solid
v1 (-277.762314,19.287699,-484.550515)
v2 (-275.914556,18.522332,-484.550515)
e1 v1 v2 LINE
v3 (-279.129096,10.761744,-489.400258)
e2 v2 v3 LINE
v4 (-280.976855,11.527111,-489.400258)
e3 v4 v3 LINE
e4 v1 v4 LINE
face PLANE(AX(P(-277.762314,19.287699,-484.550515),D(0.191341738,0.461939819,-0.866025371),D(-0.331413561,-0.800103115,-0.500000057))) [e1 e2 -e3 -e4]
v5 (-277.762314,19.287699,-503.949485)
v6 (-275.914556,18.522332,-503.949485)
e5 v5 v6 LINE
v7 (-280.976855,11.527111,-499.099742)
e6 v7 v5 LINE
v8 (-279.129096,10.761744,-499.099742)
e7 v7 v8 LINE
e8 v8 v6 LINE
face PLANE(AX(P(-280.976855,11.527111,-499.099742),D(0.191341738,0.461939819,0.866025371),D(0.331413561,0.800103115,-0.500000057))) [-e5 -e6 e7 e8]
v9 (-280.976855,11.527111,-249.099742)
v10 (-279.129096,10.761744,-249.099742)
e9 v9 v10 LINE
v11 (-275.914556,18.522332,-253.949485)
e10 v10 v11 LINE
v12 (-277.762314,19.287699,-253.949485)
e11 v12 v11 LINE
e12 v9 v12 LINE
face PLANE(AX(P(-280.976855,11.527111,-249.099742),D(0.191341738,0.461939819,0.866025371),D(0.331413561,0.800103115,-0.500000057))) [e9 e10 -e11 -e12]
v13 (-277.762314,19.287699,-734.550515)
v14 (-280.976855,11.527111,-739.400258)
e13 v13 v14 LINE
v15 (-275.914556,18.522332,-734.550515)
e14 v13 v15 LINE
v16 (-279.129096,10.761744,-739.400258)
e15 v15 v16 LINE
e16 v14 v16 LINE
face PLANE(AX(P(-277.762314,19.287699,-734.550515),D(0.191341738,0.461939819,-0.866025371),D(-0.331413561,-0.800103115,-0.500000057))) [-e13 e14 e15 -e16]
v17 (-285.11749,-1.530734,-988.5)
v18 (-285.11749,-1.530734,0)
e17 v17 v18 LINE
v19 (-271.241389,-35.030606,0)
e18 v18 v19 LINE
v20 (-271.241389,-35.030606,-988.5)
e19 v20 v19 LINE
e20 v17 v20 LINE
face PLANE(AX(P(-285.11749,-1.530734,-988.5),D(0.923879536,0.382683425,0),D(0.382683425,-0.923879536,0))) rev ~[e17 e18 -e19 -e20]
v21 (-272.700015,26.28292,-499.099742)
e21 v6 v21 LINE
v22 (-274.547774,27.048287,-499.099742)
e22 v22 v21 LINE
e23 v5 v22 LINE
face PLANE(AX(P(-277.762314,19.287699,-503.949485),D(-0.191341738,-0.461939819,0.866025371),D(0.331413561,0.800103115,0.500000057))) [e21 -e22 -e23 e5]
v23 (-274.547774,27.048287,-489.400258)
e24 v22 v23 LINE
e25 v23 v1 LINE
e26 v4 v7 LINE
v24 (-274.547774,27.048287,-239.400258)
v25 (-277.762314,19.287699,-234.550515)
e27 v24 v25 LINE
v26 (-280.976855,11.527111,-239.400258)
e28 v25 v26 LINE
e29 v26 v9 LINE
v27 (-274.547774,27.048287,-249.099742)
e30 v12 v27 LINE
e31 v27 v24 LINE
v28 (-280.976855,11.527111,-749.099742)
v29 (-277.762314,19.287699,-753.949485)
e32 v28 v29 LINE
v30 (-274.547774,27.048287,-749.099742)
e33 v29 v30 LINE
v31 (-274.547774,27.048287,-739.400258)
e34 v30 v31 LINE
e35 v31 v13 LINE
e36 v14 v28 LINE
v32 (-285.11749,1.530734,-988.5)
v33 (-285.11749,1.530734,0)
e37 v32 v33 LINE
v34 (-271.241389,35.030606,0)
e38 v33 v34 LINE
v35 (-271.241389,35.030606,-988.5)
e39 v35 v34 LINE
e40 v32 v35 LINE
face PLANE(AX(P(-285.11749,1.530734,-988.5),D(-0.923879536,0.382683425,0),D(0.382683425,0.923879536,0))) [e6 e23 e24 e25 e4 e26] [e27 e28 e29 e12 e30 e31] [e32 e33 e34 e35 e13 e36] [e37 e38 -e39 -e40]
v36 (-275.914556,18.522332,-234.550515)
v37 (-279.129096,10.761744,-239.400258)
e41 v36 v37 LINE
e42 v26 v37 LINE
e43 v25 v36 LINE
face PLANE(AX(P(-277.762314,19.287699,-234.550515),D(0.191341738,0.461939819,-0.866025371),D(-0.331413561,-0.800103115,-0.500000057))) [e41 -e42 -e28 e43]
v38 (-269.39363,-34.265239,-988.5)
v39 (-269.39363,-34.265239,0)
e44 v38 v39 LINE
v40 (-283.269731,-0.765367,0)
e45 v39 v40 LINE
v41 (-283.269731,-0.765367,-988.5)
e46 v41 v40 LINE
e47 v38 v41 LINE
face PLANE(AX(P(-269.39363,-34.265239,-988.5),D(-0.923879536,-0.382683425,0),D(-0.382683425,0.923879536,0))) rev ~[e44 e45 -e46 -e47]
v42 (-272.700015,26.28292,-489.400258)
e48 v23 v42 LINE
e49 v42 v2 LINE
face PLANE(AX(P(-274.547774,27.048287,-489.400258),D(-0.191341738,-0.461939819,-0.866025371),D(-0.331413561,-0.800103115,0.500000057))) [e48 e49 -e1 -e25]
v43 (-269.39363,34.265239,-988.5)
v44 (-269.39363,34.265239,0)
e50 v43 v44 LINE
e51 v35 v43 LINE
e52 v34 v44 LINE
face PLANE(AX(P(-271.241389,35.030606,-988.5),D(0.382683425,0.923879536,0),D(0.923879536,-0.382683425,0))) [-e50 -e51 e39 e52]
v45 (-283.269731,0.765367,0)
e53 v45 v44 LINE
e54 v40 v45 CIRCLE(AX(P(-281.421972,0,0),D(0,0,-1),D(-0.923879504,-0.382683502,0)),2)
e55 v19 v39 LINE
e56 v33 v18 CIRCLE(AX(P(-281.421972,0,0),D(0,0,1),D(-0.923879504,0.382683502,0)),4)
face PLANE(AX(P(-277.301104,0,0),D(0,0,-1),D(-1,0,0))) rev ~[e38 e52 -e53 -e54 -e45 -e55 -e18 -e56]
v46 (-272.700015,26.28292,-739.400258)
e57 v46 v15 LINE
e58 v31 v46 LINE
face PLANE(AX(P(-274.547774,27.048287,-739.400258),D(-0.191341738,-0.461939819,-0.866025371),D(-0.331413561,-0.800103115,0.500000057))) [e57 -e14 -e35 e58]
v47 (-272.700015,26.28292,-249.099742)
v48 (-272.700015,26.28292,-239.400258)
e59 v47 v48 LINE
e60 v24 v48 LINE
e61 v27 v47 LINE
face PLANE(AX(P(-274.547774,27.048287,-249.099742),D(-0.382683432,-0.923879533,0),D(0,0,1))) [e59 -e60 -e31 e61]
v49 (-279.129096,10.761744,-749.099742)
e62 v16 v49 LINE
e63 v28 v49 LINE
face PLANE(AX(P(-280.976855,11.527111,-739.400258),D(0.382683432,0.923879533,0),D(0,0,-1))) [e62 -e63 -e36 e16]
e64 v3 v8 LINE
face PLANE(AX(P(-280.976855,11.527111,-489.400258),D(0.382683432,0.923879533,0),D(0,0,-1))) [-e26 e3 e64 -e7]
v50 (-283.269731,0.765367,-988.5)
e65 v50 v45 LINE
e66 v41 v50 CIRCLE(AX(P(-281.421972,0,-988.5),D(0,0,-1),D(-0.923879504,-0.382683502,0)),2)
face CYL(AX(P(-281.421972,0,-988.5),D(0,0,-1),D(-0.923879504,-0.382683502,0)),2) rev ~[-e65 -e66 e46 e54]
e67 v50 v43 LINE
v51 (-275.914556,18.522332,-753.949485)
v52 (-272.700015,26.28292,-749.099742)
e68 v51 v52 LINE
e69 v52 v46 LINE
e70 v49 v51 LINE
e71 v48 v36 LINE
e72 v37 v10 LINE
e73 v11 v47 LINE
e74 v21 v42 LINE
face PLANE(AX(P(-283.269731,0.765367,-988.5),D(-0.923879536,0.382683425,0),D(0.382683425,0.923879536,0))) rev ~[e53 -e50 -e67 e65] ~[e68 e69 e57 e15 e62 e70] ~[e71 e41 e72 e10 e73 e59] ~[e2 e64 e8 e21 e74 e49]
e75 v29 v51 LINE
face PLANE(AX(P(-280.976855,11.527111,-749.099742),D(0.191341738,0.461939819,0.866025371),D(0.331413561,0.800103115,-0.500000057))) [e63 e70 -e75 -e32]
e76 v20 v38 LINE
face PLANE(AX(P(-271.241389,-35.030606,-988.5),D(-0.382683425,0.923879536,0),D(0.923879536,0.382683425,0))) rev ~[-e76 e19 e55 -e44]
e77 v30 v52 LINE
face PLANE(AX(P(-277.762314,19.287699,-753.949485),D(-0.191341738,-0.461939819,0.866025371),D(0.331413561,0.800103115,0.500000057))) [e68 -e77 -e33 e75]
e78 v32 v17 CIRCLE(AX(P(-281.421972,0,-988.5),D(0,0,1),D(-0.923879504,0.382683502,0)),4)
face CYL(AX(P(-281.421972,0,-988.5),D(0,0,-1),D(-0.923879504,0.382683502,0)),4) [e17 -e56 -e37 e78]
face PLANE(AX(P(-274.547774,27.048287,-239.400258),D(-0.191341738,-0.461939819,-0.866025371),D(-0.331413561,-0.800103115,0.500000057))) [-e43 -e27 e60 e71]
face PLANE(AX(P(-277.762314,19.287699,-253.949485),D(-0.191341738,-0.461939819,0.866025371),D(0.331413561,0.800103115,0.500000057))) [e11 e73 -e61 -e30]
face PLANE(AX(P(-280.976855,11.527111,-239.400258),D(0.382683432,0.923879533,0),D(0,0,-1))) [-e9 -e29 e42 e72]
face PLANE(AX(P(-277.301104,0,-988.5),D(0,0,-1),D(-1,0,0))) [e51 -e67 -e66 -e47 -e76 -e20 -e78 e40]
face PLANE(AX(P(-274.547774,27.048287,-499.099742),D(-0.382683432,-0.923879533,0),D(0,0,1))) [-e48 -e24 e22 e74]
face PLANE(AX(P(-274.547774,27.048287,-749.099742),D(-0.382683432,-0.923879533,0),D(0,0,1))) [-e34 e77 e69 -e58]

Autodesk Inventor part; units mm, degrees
ref_plane "YZ Plane" through (0, 0, 0) normal (1, 0, 0) x (0, 1, 0)
ref_plane "XZ Plane" through (0, 0, 0) normal (0, 1, 0) x (-1, 0, 0)
ref_plane "XY Plane" through (0, 0, 0) normal (0, 0, 1) x (1, 0, 0)
sketch "Sketch4" plane through (0, 0, 0) normal (0, 0, 1) x (1, 0, 0)
  line L0 (-202.056852, 202.056852) -> (0, 285.751541) construction
  line L1 (0, 285.751541) -> (202.056852, 202.056852) construction
  line L2 (202.056852, 202.056852) -> (285.751541, 0) construction
  line L3 (285.751541, 0) -> (202.056852, -202.056852) construction
  line L4 (202.056852, -202.056852) -> (0, -285.751541) construction
  line L5 (0, -285.751541) -> (-202.056852, -202.056852) construction
  line L6 (-202.056852, -202.056852) -> (-285.751541, 0) construction
  line L7 (-285.751541, 0) -> (-202.056852, 202.056852) construction
  line L8 (-285.11749, 1.530734) -> (-271.241389, 35.030606)
  line L9 (-285.11749, -1.530734) -> (-271.241389, -35.030606)
  arc A0 (-285.11749, 1.530734) -> (-285.11749, -1.530734) centre (-281.421972, 0) ccw
  point P0 (0, 0)
  point P1 (0, 0)
  point P2 (0, 0)
  dimension "d16" = 528
  dimension "d23" = 36.26
  dimension "d24" = 4
contour flange "Contour Flange1" sketch "Sketch4" thickness 2 bend radius 2 width 988.5 along (0, 0, -1) mid plane no both sides no wall seen from (-278.17944, 18.28067, 0) lies toward (0.9238795, -0.3826834, 0) curves L8 A0 L9
bend "Bend2"
corner "Corner2"
sketch "Sketch6" plane through (-285.11749, 1.530734, 0) normal (-0.9238795, 0.3826834, 0) x (0.3826834, 0.9238795, 0)
  circle A0 centre (19.22, 40.75) radius 5.5 construction
  circle A1 centre (19.22, 947.75) radius 5.5 construction
  line L0 (0, 0) -> (0, 988.5)
  line L1 (36.26, 988.5) -> (0, 988.5)
  line L2 (36.26, 0) -> (0, 0)
  line L3 (27.62, 942.900258) -> (19.22, 938.050515)
  line L4 (19.22, 938.050515) -> (10.82, 942.900258)
  line L5 (10.82, 942.900258) -> (10.82, 952.599742)
  line L6 (10.82, 952.599742) -> (19.22, 957.449485)
  line L7 (19.22, 957.449485) -> (27.62, 952.599742)
  line L8 (27.62, 952.599742) -> (27.62, 942.900258)
  line L9 (27.62, 35.900258) -> (19.22, 31.050515)
  line L10 (19.22, 31.050515) -> (10.82, 35.900258)
  line L11 (10.82, 35.900258) -> (10.82, 45.599742)
  line L12 (10.82, 45.599742) -> (19.22, 50.449485)
  line L13 (19.22, 50.449485) -> (27.62, 45.599742)
  line L14 (27.62, 45.599742) -> (27.62, 35.900258)
  point P0 (107.695526, 0)
  dimension "d36" = 11
  dimension "d41" = 11
  dimension "d93" = 19.22
  dimension "d94" = 40.75
  dimension "d95" = 19.22
  dimension "d96" = 40.75
  dimension "d98" = 16.8
  dimension "d99" = 16.8
extrude "Extrusion1" [suppressed]
sketch "Sketch13" plane through (-285.11749, 1.530734, 0) normal (-0.9238795, 0.3826834, 0) x (0.3826834, 0.9238795, 0)
  circle A0 centre (19.22, 494.25) radius 5.5 construction
  line L0 (36.26, 0) -> (36.26, 988.5)
  line L1 (36.26, 0) -> (0, 0)
  line L2 (27.62, 489.400258) -> (19.22, 484.550515)
  line L3 (19.22, 484.550515) -> (10.82, 489.400258)
  line L4 (10.82, 489.400258) -> (10.82, 499.099742)
  line L5 (10.82, 499.099742) -> (19.22, 503.949485)
  line L6 (19.22, 503.949485) -> (27.62, 499.099742)
  line L7 (27.62, 499.099742) -> (27.62, 489.400258)
  point P0 (107.695526, 0)
  point P1 (36.26, 494.25)
  point P2 (35, 910)
  point P3 (35, 1110)
  point P4 (18.13, 0)
  point P5 (27.62, 494.25)
  dimension "d83" = 11
  dimension "magic_d1" = 17.04
  dimension "d97" = 16.8
extrude "Extrusion7" cut sketch "Sketch13" against normal through all
pattern_linear "Rectangular Pattern5" count 3 spacing 250 along (0, 0, 1) of "Extrusion7" first direction both ways yes
equation "\"d16\" = Барабан_размер_по_плоскостям - Thickness"
equation "\"d24\" = BendRadius + Thickness"
equation "\"d41\" = d36"
equation "\"d95\" = d93"
equation "\"d96\" = d94"
equation "\"d99\" = d98"
equation "\"d25\" = Thickness"
equation "\"d26\" = BendReliefWidth"
equation "\"d27\" = BendReliefDepth"
equation "\"d28\" = MinimumRemnant"
equation "\"d29\" = TransitionRadius"
equation "\"d31\" = BendRadius"
equation "\"d33\" = CornerReliefSize"
equation "\"d34\" = GapSize"
equation "\"d35\" = JacobiRadiusSize"
equation "\"BendRadius\" = Thickness"
equation "\"BendReliefWidth\" = Thickness"
equation "\"BendReliefDepth\" = 0.5 * Thickness"
equation "\"CornerReliefSize\" = 4 * Thickness"
equation "\"MinimumRemnant\" = 2 * Thickness"
equation "\"TransitionRadius\" = BendRadius"
equation "\"JacobiRadiusSize\" = BendRadius"
equation "\"GapSize\" = Thickness"
equation "\"Барабан_размер_по_плоскостям\" = 530"
equation "\"Thickness\" = 2"
properties part number "DMF 01 17 опора крышки v2.1_CPY" material "Stainless Steel AISI 304"
